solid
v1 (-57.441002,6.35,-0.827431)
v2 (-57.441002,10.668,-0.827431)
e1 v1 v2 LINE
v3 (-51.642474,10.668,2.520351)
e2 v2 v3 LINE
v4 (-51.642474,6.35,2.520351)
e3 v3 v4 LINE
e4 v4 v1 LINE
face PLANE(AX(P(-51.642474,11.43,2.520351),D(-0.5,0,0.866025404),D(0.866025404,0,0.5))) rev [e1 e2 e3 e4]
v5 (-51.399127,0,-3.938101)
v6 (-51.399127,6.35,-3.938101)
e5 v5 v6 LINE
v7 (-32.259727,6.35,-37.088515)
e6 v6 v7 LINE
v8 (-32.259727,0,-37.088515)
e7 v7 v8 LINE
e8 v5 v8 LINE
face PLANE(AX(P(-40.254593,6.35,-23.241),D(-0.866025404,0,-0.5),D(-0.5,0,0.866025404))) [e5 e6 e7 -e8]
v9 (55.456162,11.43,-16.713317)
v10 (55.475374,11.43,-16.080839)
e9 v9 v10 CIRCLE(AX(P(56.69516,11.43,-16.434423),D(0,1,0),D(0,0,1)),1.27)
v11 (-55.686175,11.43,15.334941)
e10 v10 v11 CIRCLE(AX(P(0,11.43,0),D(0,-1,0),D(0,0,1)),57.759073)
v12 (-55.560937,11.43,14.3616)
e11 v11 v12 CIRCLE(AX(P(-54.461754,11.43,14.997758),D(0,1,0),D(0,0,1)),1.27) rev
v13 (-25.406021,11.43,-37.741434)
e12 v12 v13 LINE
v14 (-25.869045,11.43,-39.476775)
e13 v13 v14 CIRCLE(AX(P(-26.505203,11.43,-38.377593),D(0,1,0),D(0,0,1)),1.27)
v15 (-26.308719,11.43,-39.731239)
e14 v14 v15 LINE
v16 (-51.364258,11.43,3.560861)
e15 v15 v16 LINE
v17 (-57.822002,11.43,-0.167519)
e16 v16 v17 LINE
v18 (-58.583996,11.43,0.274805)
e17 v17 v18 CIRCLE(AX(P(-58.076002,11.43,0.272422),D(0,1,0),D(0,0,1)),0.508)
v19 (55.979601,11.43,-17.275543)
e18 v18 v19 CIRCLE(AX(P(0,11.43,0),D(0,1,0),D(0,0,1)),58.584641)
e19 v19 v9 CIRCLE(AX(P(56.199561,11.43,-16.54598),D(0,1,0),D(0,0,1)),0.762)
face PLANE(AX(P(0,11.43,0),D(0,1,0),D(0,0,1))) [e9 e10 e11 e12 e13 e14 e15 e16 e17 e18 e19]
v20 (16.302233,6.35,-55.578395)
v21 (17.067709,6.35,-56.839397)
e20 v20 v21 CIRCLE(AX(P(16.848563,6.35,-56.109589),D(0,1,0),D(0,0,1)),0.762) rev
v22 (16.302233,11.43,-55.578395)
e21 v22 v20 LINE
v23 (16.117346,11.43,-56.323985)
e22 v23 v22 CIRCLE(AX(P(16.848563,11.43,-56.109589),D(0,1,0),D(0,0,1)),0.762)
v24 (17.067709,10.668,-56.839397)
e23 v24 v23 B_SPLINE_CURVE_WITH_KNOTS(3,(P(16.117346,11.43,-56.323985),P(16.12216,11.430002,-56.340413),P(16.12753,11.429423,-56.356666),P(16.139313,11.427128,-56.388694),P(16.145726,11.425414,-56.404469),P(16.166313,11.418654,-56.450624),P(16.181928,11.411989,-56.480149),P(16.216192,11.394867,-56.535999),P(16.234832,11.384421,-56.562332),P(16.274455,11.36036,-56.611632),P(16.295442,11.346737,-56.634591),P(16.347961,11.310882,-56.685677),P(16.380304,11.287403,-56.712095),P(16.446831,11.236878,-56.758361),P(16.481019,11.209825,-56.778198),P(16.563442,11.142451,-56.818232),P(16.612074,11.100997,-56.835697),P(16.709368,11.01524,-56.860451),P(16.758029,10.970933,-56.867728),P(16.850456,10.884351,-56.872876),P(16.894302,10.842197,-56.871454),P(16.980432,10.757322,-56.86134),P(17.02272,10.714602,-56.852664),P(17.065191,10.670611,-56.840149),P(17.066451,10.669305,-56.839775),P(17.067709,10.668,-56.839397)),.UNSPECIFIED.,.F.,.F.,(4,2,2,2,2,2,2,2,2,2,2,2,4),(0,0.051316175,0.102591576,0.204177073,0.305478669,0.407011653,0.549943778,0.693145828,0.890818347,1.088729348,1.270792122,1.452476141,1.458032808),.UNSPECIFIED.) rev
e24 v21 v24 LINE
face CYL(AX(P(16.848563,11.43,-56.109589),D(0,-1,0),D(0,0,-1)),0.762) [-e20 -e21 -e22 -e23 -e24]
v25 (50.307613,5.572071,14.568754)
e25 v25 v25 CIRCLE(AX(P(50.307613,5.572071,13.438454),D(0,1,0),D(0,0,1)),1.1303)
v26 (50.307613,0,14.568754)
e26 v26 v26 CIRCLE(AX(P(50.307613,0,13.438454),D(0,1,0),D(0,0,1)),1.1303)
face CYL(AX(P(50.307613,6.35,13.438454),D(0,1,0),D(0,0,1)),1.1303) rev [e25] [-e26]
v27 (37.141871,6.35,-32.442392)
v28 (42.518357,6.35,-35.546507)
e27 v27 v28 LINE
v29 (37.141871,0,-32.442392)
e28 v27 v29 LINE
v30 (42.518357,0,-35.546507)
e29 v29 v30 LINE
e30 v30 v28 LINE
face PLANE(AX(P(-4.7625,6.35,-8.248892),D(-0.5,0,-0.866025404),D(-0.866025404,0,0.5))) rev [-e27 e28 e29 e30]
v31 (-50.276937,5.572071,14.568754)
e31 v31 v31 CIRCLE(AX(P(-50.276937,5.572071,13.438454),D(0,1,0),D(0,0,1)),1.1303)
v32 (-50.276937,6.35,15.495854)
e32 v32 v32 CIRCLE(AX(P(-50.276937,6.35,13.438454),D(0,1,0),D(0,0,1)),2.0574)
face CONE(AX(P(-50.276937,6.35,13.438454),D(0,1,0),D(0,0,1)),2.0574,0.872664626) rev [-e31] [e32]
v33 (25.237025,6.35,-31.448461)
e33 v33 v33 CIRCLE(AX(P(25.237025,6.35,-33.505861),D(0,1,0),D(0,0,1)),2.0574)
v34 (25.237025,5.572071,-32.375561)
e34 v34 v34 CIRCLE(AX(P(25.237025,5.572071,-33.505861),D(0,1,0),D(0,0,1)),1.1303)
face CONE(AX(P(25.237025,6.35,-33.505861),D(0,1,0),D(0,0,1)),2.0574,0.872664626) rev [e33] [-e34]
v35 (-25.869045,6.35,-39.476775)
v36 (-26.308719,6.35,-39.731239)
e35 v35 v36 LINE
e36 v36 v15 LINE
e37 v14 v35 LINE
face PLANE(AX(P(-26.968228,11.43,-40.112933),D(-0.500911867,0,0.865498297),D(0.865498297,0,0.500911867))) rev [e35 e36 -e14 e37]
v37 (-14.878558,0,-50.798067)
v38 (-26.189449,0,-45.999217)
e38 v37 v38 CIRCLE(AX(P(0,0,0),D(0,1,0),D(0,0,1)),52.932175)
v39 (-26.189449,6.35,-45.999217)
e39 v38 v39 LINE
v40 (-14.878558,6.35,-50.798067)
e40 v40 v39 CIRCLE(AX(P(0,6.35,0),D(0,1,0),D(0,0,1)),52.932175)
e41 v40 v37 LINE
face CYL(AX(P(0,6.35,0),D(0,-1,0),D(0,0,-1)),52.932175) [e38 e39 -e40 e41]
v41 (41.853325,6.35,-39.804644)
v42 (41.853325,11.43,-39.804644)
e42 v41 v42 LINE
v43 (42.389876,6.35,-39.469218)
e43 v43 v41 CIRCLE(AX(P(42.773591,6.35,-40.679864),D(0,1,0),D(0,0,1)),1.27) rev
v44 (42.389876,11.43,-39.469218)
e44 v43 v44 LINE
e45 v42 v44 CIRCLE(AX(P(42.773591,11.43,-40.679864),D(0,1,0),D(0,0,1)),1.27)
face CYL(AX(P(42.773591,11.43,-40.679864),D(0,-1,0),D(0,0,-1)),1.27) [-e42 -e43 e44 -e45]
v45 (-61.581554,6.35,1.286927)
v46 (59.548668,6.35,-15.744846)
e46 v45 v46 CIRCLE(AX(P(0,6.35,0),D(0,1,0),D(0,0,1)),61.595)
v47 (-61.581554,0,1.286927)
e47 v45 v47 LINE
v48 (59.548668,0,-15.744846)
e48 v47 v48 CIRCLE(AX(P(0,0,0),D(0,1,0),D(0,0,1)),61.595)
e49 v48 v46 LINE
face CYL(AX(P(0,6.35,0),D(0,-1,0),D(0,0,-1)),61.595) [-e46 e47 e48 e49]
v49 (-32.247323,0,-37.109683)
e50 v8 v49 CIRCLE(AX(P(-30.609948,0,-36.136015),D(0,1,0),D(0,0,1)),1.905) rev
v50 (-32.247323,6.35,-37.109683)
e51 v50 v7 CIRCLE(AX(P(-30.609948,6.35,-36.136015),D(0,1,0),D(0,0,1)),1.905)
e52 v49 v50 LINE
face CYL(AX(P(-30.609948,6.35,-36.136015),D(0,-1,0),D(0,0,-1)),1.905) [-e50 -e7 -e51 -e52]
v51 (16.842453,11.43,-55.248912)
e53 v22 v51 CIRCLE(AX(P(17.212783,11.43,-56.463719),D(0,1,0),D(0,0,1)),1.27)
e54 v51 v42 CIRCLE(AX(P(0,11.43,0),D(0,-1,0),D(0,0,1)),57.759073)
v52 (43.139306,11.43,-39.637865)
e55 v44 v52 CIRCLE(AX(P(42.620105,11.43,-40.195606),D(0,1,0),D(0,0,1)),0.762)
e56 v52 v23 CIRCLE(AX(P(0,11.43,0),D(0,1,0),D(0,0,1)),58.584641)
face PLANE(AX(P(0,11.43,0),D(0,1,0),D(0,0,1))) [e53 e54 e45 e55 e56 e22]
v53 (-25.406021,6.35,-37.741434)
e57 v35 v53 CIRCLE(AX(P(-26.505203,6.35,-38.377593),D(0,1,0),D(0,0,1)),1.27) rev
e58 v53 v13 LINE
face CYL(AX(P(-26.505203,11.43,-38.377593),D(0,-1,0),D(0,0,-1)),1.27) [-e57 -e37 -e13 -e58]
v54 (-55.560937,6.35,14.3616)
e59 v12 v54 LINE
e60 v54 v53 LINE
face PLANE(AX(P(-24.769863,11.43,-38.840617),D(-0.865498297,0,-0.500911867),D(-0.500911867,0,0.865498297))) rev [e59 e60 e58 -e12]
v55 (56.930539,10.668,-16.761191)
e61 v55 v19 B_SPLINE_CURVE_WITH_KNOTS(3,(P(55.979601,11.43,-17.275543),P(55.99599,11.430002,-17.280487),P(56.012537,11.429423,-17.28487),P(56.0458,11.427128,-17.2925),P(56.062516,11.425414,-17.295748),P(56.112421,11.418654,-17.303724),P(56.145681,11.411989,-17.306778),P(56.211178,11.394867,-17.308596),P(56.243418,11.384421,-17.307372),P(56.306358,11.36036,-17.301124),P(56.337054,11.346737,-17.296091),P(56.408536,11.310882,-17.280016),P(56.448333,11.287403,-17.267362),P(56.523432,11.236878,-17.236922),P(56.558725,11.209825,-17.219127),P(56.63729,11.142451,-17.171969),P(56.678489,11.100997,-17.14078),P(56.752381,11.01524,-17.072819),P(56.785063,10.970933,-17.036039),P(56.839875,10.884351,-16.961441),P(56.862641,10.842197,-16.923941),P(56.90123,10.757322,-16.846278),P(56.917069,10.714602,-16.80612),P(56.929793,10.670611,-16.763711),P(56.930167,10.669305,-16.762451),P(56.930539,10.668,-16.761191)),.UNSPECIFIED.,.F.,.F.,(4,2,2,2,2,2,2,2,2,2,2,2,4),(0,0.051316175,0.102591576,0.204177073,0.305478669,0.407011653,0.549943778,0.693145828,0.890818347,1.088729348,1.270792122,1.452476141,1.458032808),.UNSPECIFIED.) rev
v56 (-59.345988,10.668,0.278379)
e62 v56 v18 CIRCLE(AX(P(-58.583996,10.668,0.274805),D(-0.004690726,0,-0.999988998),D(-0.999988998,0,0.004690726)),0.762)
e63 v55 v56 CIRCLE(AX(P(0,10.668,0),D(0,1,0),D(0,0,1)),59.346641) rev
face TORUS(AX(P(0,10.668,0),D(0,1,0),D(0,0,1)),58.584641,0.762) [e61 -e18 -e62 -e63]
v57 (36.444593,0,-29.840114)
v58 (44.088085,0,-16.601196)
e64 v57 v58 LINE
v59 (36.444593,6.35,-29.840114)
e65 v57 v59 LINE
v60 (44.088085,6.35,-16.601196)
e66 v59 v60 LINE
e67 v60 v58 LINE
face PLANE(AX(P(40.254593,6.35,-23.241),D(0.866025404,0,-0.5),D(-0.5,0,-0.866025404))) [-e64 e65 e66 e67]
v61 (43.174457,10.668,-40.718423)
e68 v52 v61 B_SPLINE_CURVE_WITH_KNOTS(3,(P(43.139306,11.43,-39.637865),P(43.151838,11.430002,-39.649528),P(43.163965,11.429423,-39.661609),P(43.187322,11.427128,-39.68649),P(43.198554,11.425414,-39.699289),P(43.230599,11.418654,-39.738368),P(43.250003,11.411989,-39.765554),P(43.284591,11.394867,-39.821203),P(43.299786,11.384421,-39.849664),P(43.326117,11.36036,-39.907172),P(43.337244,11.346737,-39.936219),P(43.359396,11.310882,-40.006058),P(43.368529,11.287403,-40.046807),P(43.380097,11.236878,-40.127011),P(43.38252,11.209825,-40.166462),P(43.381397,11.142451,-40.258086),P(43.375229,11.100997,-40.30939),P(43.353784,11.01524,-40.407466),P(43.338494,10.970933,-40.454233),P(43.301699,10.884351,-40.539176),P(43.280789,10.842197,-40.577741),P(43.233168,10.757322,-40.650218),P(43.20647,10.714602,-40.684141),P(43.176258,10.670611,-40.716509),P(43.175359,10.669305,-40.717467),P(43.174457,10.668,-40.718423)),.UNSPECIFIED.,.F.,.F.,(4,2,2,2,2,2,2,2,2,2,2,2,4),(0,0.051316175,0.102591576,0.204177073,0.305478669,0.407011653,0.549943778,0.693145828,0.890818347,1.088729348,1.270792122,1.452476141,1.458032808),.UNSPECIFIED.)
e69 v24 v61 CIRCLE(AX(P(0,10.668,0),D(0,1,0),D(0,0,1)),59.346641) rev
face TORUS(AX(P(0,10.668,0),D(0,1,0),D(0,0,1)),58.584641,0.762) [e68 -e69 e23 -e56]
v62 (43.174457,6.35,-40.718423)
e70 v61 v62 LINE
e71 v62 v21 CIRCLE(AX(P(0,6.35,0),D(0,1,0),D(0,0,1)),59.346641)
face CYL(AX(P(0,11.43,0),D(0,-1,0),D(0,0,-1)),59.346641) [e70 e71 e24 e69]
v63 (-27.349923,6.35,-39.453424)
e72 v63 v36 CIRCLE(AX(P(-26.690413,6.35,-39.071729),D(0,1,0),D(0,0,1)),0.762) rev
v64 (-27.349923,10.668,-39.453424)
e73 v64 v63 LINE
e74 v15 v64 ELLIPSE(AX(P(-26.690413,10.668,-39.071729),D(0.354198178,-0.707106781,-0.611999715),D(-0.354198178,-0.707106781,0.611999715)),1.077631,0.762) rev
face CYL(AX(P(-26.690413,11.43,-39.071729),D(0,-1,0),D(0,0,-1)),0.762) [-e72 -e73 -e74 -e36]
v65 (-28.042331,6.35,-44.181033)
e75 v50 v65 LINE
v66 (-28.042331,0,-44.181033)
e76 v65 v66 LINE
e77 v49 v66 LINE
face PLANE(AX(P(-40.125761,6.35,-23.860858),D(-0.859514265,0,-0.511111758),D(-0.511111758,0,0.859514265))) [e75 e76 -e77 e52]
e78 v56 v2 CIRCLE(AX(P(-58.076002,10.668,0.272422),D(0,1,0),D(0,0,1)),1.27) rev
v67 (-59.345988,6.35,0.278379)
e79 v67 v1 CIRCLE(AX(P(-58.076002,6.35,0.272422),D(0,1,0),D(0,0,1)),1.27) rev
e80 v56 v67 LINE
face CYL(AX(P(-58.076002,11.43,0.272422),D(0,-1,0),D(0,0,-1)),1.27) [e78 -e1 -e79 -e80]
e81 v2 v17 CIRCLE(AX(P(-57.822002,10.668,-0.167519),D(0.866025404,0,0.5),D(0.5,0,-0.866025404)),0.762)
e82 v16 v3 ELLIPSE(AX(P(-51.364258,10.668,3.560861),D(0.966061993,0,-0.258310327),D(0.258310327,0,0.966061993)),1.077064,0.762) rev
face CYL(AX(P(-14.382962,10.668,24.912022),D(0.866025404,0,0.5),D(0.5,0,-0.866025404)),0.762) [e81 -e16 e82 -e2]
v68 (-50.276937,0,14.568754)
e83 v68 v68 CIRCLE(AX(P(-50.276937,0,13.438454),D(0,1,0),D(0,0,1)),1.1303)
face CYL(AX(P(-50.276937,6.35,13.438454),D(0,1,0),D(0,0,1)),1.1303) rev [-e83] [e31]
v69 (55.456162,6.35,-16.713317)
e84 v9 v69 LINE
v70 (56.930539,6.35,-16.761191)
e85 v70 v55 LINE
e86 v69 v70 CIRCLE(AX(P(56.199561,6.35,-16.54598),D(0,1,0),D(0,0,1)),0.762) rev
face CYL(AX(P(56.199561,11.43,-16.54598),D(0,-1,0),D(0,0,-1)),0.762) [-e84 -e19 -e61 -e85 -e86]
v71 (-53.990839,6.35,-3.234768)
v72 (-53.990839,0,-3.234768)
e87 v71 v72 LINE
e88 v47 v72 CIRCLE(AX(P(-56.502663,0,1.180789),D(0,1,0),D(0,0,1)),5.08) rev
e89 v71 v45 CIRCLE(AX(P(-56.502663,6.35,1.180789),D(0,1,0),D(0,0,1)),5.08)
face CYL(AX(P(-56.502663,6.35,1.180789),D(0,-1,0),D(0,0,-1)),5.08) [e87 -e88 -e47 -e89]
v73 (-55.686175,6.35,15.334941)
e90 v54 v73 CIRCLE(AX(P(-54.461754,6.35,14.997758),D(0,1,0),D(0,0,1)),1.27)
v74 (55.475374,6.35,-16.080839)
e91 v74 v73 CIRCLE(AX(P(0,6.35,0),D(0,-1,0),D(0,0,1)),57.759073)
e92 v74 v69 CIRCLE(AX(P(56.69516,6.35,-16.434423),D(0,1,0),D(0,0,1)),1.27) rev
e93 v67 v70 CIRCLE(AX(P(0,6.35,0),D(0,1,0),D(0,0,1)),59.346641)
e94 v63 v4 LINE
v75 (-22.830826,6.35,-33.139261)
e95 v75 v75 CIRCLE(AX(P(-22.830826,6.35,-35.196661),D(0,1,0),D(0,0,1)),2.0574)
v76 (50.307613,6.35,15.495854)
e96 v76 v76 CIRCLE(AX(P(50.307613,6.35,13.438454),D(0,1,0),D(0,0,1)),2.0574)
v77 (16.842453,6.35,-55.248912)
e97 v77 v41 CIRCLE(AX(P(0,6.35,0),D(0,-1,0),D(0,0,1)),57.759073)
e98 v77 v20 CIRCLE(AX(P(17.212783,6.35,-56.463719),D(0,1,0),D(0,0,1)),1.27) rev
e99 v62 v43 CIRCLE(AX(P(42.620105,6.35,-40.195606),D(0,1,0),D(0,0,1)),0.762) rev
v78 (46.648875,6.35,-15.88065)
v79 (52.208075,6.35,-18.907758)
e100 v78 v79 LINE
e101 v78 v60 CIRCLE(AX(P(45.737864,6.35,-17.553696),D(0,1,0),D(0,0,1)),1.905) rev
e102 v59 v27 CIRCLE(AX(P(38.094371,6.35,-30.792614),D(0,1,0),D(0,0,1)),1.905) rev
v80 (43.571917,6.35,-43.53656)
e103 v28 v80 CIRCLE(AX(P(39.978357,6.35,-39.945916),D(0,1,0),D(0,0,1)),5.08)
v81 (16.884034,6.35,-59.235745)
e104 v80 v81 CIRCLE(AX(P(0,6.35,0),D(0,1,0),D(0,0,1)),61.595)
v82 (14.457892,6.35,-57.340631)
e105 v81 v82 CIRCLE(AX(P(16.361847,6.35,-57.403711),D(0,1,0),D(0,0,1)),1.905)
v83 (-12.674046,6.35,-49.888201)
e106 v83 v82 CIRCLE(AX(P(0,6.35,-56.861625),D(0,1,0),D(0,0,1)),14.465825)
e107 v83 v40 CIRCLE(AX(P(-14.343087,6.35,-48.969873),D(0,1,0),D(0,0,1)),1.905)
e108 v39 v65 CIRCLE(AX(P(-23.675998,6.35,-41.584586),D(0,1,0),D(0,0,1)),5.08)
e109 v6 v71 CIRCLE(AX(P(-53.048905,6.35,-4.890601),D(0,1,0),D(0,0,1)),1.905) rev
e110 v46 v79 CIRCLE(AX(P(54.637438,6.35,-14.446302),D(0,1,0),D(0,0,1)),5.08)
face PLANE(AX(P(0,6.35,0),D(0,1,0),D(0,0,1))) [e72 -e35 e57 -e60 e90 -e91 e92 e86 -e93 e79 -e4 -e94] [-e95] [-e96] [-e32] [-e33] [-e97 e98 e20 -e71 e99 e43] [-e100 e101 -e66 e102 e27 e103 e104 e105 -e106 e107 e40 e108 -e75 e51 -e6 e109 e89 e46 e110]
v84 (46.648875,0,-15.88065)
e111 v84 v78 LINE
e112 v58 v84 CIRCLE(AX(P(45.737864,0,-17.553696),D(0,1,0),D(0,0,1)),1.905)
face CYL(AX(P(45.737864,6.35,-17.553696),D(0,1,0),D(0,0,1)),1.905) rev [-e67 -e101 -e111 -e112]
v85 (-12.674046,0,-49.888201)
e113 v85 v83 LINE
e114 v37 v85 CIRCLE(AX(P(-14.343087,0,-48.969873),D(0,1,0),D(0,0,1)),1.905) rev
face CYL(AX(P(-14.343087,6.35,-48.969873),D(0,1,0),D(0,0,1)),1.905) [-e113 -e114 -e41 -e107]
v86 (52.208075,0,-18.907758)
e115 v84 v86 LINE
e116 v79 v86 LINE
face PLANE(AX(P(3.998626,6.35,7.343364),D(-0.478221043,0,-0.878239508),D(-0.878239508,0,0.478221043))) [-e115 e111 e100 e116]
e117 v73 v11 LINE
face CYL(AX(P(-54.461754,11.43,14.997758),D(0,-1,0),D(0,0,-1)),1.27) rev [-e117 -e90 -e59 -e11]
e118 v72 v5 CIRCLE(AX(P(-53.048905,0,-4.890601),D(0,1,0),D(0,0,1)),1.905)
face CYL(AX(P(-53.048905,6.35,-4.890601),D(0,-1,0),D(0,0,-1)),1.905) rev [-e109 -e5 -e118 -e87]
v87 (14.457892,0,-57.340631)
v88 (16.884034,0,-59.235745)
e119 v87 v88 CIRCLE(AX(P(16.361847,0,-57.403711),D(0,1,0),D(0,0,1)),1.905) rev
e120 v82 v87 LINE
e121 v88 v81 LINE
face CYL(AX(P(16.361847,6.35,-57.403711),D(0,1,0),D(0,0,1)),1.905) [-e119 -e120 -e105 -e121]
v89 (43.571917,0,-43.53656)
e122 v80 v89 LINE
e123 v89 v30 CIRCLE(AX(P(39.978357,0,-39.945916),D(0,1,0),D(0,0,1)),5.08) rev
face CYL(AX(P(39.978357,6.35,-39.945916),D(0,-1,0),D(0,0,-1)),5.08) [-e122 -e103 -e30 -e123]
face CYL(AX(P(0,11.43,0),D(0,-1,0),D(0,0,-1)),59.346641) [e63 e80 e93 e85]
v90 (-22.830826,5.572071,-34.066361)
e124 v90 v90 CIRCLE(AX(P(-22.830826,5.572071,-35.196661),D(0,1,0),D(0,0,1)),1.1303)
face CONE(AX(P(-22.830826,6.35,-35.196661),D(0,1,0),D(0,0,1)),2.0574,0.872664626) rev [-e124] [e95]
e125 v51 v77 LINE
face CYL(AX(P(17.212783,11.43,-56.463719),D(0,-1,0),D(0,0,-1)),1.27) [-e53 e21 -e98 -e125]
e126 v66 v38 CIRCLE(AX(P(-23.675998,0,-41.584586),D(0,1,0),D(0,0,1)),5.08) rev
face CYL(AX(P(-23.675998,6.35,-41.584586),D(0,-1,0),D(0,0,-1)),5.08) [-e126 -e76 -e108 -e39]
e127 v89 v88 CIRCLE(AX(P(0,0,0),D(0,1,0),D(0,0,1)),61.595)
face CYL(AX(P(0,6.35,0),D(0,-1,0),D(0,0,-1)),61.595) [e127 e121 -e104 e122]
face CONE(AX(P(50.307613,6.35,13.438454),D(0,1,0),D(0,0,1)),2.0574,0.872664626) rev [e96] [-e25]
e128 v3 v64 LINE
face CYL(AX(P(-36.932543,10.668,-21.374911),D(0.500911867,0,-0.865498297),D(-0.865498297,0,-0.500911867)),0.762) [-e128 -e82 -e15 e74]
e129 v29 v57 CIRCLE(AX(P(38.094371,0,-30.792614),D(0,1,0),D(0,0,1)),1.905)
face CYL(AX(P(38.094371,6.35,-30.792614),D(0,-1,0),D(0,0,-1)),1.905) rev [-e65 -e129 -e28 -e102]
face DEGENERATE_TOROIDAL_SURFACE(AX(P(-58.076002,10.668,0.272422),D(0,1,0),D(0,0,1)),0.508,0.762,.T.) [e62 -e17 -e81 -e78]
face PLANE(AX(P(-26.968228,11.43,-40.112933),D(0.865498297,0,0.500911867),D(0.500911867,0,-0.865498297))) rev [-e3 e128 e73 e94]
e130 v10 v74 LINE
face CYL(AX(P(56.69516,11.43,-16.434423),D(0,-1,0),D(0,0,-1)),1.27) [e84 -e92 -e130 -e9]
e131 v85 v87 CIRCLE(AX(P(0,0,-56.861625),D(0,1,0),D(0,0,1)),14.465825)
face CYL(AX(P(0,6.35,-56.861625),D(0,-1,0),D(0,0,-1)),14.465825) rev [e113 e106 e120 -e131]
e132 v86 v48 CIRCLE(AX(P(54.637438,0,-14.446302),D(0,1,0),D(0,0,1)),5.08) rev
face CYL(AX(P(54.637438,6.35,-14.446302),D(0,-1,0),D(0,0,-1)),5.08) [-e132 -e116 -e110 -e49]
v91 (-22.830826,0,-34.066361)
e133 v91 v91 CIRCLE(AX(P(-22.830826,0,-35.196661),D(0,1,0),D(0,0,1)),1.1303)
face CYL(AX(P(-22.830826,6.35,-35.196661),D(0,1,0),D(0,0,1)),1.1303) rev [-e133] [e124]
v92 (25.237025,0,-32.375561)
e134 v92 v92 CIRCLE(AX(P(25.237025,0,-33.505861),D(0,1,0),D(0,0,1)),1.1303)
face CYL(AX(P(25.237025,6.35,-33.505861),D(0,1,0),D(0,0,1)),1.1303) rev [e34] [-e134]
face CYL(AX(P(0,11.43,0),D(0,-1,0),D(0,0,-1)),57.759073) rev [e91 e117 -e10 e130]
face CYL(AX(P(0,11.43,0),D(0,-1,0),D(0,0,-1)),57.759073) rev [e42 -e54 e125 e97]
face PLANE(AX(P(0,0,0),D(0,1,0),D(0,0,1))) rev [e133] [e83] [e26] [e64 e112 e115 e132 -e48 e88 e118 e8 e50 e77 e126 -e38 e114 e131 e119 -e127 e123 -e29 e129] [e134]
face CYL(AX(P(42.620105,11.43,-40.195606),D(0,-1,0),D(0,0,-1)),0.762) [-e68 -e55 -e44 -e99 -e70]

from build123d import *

# Parameters (mm, degrees)
BOSS_EXTRUDE1_DEPTH             = 6.35
BOSS_EXTRUDE6_DEPTH             = 5.08
FILLET14_R                      = 5.08
FILLET16_R                      = 1.905
FILLET17_R                      = 1.27
FILLET18_R                      = 0.762
F_4_40_TAPPED_HOLE2_D           = 2.2606
F_4_40_TAPPED_HOLE2_CSINK_D     = 4.1148
F_4_40_TAPPED_HOLE2_CSINK_ANGLE = 100


with BuildPart() as part:
    # Sketch1 → Boss-Extrude1 (new body)
    with BuildSketch(Plane(origin=(0, 0, 0), x_dir=(1, 0, 0), z_dir=(0, 1, 0))):
        with BuildLine():
            Line((-32.253592819, 37.099138511), (-40.254592819, 23.241))
            Line((-40.254592819, 23.241), (-52.351555238, 2.288446473))
            Line((-52.351555238, 2.288446473), (-61.152528051, 7.369690496))
            ThreePointArc((-61.152528051, 7.369690496), (7.45083255, -61.142694734), (57.593043611, 21.839994338))
            Line((57.593043611, 21.839994338), (45.017092819, 14.992108029))
            Line((45.017092819, 14.992108029), (35.492092819, 31.489891971))
            Line((35.492092819, 31.489891971), (47.93867456, 38.67592929))
            ThreePointArc((47.93867456, 38.67592929), (32.807858132, 52.130494624), (14.131882123, 59.951930183))
            ThreePointArc((14.131882123, 59.951930183), (4.380709214, 43.075056101), (-13.323695155, 51.227866526))
            ThreePointArc((-13.323695155, 51.227866526), (-20.56358212, 48.774524619), (-27.374593602, 45.30393787))
            Line((-27.374593602, 45.30393787), (-32.253592819, 37.099138511))
        make_face()
    extrude(amount=BOSS_EXTRUDE1_DEPTH)

    # Sketch11 → Boss-Extrude6 (add)
    with BuildSketch(Plane(origin=(0, 6.35, 0), x_dir=(1, 0, 0), z_dir=(0, 1, 0))):
        with BuildLine():
            Line((-51.642474306, -2.520350645), (-59.315900126, 1.909903818))
            ThreePointArc((-59.315900126, 1.909903818), (8.075233998, -58.794679489), (56.604538416, 17.831151702))
            Line((56.604538416, 17.831151702), (55.18302034, 17.057103335))
            ThreePointArc((55.18302034, 17.057103335), (15.941309212, -55.515629949), (-55.825680829, -14.819037351))
            Line((-55.825680829, -14.819037351), (-24.769862567, 38.840617327))
            Line((-24.769862567, 38.840617327), (-26.96822824, 40.112933469))
            Line((-26.96822824, 40.112933469), (-51.642474306, -2.520350645))
        make_face()
        with BuildLine():
            Line((42.534833803, 39.075547615), (43.942550941, 39.888293484))
            ThreePointArc((43.942550941, 39.888293484), (31.224480147, 50.468362167), (16.080037332, 57.1266675))
            Line((16.080037332, 57.1266675), (15.64988416, 55.598485895))
            ThreePointArc((15.64988416, 55.598485895), (30.242639161, 49.208670827), (42.534833803, 39.075547615))
        make_face()
    extrude(amount=BOSS_EXTRUDE6_DEPTH)

    # Fillet14
    fillet14_edges = [part.edges().sort_by_distance(p)[0] for p in [
        (47.93867456, 3.175, -38.67592929),
        (57.593043611, 3.175, -21.839994338),
        (-61.152528051, 3.175, -7.369690496),
        (-27.374593602, 3.175, -45.30393787),
    ]]
    fillet(fillet14_edges, radius=FILLET14_R)

    # Fillet16
    fillet16_edges = [part.edges().sort_by_distance(p)[0] for p in [
        (45.017092819, 3.175, -14.992108029),
        (35.492092819, 3.175, -31.489891971),
        (-13.323695155, 3.175, -51.227866526),
        (14.131882123, 3.175, -59.951930183),
        (-32.253592819, 3.175, -37.099138511),
        (-52.351555238, 3.175, -2.288446473),
    ]]
    fillet(fillet16_edges, radius=FILLET16_R)

    # Fillet17
    fillet17_edges = [part.edges().sort_by_distance(p)[0] for p in [
        (-24.769862567, 8.89, -38.840617327),
        (-59.315900126, 8.89, -1.909903818),
        (55.18302034, 8.89, -17.057103335),
        (-55.825680829, 8.89, 14.819037351),
        (15.64988416, 8.89, -55.598485895),
        (42.534833803, 8.89, -39.075547615),
    ]]
    fillet(fillet17_edges, radius=FILLET17_R)

    # Fillet18
    # the kernel refuses this fillet: 0.762 mm, written as the material it takes off along each edge
    with BuildSketch(Plane(origin=(56.604538416, 6.35, -17.831151702), x_dir=(0.2914560828028139, 0, 0.9565842105101043), z_dir=(0, 1, 0))) as fillet18_piece_1:
        with BuildLine():
            CenterArc((1.111341465, -0.761966165), FILLET18_R, 89.460057438, 150.909144636)
            Line((0.734601677, -1.424318889), (0.696927698, -1.490554162))
            ThreePointArc((0.696927698, -1.490554162), (0.043911241, -0.591644128), (-0.074637174, -0.015353572))
            Line((-0.074637174, -0.015353572), (-0.000718081, 0.076196616))
            ThreePointArc((-0.000718081, 0.076196616), (0.559261138, 0.078835195), (1.119240357, 0.076196616))
            Line((1.119240357, 0.076196616), (1.118522276, 0))
        make_face()
    extrude(amount=9.086497787, mode=Mode.SUBTRACT)
    with BuildSketch(Plane(origin=(43.942550941, 6.35, -39.888293484), x_dir=(-0.9654520894435082, 0, 0.2605806266574016), z_dir=(0, 1, 0))) as fillet18_piece_2:
        with BuildLine():
            CenterArc((1.196678226, -0.641298996), FILLET18_R, 57.309434955, 150.909144636)
            Line((0.525241797, -1.001600428), (0.458098154, -1.037630571))
            ThreePointArc((0.458098154, -1.037630571), (0.192751008, -0.537440161), (-0.067818044, -0.034744107))
            Line((-0.067818044, -0.034744107), (-0.019587713, 0.073639402))
            ThreePointArc((-0.019587713, 0.073639402), (0.576256944, 0.232131105), (1.649391505, 0.0641299))
            Line((1.649391505, 0.0641299), (1.608235753, 0))
        make_face()
    extrude(amount=9.100589381, mode=Mode.SUBTRACT)
    with BuildSketch(Plane(origin=(-26.96822824, 6.35, -40.112933469), x_dir=(-0.5009118669957486, 0, 0.8654982966492963), z_dir=(0, 1, 0))) as fillet18_piece_3:
        with BuildLine():
            CenterArc((FILLET18_R, FILLET18_R), FILLET18_R, 180, 90)
            Line((0, FILLET18_R), (0, 0))
            Line((0, 0), (FILLET18_R, 0))
        make_face()
    extrude(amount=6.985, mode=Mode.SUBTRACT)
    with BuildSketch(Plane(origin=(16.080037332, 6.35, -57.1266675), x_dir=(0.960208894047144, 0, 0.2792827953755126), z_dir=(0, 1, 0))) as fillet18_piece_4:
        with BuildLine():
            CenterArc((1.021997529, -0.761971386), FILLET18_R, 89.503466107, 150.909144636)
            Line((0.645759664, -1.424609348), (0.608135877, -1.490873144))
            ThreePointArc((0.608135877, -1.490873144), (-0.073326676, -0.331878972), (-0.076197139, -0.000660352))
            Line((-0.076197139, -0.000660352), (-0.000660352, 0.076197139))
            ThreePointArc((-0.000660352, 0.076197139), (0.514300527, 0.078428517), (1.029261406, 0.076197139))
            Line((1.029261406, 0.076197139), (1.028601054, 0))
        make_face()
    extrude(amount=8.990336733, mode=Mode.SUBTRACT)
    with BuildSketch(Plane(origin=(-49.992695912, 11.43, 3.472850645), x_dir=(0, -1, 0), z_dir=(-0.8660254037844384, 0, -0.5000000000000006))) as fillet18_piece_5_section:
        with BuildLine():
            CenterArc((FILLET18_R, FILLET18_R), FILLET18_R, 180, 90)
            Line((0, FILLET18_R), (0, 0))
            Line((0, 0), (FILLET18_R, 0))
        make_face()
    fillet18_piece_5 = extrude(amount=8.600562568, mode=Mode.PRIVATE)
    fillet18_piece_5 = split(fillet18_piece_5, bisect_by=Plane(origin=(-51.641469253, 11.43, 2.518614067), z_dir=(-0.8654982966492973, 0, -0.5009118669957471)), keep=Keep.TOP, mode=Mode.PRIVATE)
    add(fillet18_piece_5, mode=Mode.SUBTRACT)
    with BuildSketch(Plane(origin=(-58.076001583, 11.43, 0.272421623), x_dir=(0.49999999999999845, 0, -0.8660254037844397), z_dir=(0.8660254037844397, 0, 0.49999999999999845))) as fillet18_piece_6:
        with BuildLine():
            CenterArc((1.27 - FILLET18_R, -FILLET18_R), FILLET18_R, 0, 90)
            Line((1.27 - FILLET18_R, 0), (1.27, 0))
            Line((1.27, 0), (1.27, -FILLET18_R))
        make_face()
    revolve(axis=Axis((-58.076001583, 11.43, 0.272421623), (0, 1, 0)), revolution_arc=120.268759804, mode=Mode.SUBTRACT)
    with BuildSketch(Plane(origin=(-26.013991134, 11.43, -41.761707724), x_dir=(0, -1, 0), z_dir=(-0.5009118669957471, 0, 0.8654982966492973))) as fillet18_piece_7_section:
        with BuildLine():
            CenterArc((FILLET18_R, FILLET18_R), FILLET18_R, 180, 90)
            Line((0, FILLET18_R), (0, 0))
            Line((0, 0), (FILLET18_R, 0))
        make_face()
    fillet18_piece_7 = extrude(amount=53.068657444, mode=Mode.PRIVATE)
    fillet18_piece_7 = split(fillet18_piece_7, bisect_by=Plane(origin=(-51.595805666, 11.43, 2.547294796), z_dir=(0.5000000000000006, 0, -0.8660254037844384)), keep=Keep.TOP, mode=Mode.PRIVATE)
    add(fillet18_piece_7, mode=Mode.SUBTRACT)
    with BuildSketch(Plane(origin=(0, 11.43, 0), x_dir=(0.761629515590845, 0, -0.6480127166814359), z_dir=(0.6480127166814359, 0, 0.761629515590845))) as fillet18_piece_8:
        with BuildLine():
            CenterArc((59.346640514 - FILLET18_R, -FILLET18_R), FILLET18_R, 0, 90)
            Line((59.346640514 - FILLET18_R, 0), (59.346640514, 0))
            Line((59.346640514, 0), (59.346640514, -FILLET18_R))
        make_face()
    revolve(axis=Axis((0, 11.43, 0), (0, 1, 0)), revolution_arc=35.726455219, mode=Mode.SUBTRACT)
    with BuildSketch(Plane(origin=(0, 11.43, 0), x_dir=(-0.9999889984830188, 0, 0.004690726268822115), z_dir=(-0.004690726268822115, 0, -0.9999889984830188))) as fillet18_piece_9:
        with BuildLine():
            CenterArc((59.346640514 - FILLET18_R, -FILLET18_R), FILLET18_R, 0, 90)
            Line((59.346640514 - FILLET18_R, 0), (59.346640514, 0))
            Line((59.346640514, 0), (59.346640514, -FILLET18_R))
        make_face()
    revolve(axis=Axis((0, 11.43, 0), (0, 1, 0)), revolution_arc=199.059052139, mode=Mode.SUBTRACT)
    with BuildSketch(Plane(origin=(-49.992695912, 11.43, 3.472850645), x_dir=(0, -1, 0), z_dir=(-0.8660254037844384, 0, -0.5000000000000006))) as fillet18_piece_10a_section:
        with BuildLine():
            CenterArc((FILLET18_R, FILLET18_R), FILLET18_R, 180, 90)
            Line((0, FILLET18_R), (0, 0))
            Line((0, 0), (FILLET18_R, 0))
        make_face()
    fillet18_piece_10a = extrude(amount=8.600562568, mode=Mode.PRIVATE)
    fillet18_piece_10a = split(fillet18_piece_10a, bisect_by=Plane(origin=(-51.641469253, 11.43, 2.518614067), z_dir=(0.8654982966492973, 0, 0.5009118669957471)), keep=Keep.TOP, mode=Mode.PRIVATE)
    with BuildSketch(Plane(origin=(-26.013991134, 11.43, -41.761707724), x_dir=(0, -1, 0), z_dir=(-0.5009118669957471, 0, 0.8654982966492973))) as fillet18_piece_10b_section:
        with BuildLine():
            CenterArc((FILLET18_R, FILLET18_R), FILLET18_R, 180, 90)
            Line((0, FILLET18_R), (0, 0))
            Line((0, 0), (FILLET18_R, 0))
        make_face()
    fillet18_piece_10b = extrude(amount=53.068657444, mode=Mode.PRIVATE)
    fillet18_piece_10b = split(fillet18_piece_10b, bisect_by=Plane(origin=(-51.595805666, 11.43, 2.547294796), z_dir=(-0.5000000000000006, 0, 0.8660254037844384)), keep=Keep.TOP, mode=Mode.PRIVATE)
    fillet18_piece_10 = fillet18_piece_10a & fillet18_piece_10b
    add(fillet18_piece_10, mode=Mode.SUBTRACT)

    # #4-40 Tapped Hole2 (through all)
    with Locations(Plane(origin=(0, 6.35, 0), x_dir=(1, 0, 0), z_dir=(0, 1, 0))):
        with Locations((-22.830825604, 35.196661052), (-50.276937356, -13.438454396), (50.307612814, -13.438454396), (25.237025094, 33.505861406)):
            CounterSinkHole(F_4_40_TAPPED_HOLE2_D / 2, F_4_40_TAPPED_HOLE2_CSINK_D / 2, counter_sink_angle=F_4_40_TAPPED_HOLE2_CSINK_ANGLE)


solid = part.part
